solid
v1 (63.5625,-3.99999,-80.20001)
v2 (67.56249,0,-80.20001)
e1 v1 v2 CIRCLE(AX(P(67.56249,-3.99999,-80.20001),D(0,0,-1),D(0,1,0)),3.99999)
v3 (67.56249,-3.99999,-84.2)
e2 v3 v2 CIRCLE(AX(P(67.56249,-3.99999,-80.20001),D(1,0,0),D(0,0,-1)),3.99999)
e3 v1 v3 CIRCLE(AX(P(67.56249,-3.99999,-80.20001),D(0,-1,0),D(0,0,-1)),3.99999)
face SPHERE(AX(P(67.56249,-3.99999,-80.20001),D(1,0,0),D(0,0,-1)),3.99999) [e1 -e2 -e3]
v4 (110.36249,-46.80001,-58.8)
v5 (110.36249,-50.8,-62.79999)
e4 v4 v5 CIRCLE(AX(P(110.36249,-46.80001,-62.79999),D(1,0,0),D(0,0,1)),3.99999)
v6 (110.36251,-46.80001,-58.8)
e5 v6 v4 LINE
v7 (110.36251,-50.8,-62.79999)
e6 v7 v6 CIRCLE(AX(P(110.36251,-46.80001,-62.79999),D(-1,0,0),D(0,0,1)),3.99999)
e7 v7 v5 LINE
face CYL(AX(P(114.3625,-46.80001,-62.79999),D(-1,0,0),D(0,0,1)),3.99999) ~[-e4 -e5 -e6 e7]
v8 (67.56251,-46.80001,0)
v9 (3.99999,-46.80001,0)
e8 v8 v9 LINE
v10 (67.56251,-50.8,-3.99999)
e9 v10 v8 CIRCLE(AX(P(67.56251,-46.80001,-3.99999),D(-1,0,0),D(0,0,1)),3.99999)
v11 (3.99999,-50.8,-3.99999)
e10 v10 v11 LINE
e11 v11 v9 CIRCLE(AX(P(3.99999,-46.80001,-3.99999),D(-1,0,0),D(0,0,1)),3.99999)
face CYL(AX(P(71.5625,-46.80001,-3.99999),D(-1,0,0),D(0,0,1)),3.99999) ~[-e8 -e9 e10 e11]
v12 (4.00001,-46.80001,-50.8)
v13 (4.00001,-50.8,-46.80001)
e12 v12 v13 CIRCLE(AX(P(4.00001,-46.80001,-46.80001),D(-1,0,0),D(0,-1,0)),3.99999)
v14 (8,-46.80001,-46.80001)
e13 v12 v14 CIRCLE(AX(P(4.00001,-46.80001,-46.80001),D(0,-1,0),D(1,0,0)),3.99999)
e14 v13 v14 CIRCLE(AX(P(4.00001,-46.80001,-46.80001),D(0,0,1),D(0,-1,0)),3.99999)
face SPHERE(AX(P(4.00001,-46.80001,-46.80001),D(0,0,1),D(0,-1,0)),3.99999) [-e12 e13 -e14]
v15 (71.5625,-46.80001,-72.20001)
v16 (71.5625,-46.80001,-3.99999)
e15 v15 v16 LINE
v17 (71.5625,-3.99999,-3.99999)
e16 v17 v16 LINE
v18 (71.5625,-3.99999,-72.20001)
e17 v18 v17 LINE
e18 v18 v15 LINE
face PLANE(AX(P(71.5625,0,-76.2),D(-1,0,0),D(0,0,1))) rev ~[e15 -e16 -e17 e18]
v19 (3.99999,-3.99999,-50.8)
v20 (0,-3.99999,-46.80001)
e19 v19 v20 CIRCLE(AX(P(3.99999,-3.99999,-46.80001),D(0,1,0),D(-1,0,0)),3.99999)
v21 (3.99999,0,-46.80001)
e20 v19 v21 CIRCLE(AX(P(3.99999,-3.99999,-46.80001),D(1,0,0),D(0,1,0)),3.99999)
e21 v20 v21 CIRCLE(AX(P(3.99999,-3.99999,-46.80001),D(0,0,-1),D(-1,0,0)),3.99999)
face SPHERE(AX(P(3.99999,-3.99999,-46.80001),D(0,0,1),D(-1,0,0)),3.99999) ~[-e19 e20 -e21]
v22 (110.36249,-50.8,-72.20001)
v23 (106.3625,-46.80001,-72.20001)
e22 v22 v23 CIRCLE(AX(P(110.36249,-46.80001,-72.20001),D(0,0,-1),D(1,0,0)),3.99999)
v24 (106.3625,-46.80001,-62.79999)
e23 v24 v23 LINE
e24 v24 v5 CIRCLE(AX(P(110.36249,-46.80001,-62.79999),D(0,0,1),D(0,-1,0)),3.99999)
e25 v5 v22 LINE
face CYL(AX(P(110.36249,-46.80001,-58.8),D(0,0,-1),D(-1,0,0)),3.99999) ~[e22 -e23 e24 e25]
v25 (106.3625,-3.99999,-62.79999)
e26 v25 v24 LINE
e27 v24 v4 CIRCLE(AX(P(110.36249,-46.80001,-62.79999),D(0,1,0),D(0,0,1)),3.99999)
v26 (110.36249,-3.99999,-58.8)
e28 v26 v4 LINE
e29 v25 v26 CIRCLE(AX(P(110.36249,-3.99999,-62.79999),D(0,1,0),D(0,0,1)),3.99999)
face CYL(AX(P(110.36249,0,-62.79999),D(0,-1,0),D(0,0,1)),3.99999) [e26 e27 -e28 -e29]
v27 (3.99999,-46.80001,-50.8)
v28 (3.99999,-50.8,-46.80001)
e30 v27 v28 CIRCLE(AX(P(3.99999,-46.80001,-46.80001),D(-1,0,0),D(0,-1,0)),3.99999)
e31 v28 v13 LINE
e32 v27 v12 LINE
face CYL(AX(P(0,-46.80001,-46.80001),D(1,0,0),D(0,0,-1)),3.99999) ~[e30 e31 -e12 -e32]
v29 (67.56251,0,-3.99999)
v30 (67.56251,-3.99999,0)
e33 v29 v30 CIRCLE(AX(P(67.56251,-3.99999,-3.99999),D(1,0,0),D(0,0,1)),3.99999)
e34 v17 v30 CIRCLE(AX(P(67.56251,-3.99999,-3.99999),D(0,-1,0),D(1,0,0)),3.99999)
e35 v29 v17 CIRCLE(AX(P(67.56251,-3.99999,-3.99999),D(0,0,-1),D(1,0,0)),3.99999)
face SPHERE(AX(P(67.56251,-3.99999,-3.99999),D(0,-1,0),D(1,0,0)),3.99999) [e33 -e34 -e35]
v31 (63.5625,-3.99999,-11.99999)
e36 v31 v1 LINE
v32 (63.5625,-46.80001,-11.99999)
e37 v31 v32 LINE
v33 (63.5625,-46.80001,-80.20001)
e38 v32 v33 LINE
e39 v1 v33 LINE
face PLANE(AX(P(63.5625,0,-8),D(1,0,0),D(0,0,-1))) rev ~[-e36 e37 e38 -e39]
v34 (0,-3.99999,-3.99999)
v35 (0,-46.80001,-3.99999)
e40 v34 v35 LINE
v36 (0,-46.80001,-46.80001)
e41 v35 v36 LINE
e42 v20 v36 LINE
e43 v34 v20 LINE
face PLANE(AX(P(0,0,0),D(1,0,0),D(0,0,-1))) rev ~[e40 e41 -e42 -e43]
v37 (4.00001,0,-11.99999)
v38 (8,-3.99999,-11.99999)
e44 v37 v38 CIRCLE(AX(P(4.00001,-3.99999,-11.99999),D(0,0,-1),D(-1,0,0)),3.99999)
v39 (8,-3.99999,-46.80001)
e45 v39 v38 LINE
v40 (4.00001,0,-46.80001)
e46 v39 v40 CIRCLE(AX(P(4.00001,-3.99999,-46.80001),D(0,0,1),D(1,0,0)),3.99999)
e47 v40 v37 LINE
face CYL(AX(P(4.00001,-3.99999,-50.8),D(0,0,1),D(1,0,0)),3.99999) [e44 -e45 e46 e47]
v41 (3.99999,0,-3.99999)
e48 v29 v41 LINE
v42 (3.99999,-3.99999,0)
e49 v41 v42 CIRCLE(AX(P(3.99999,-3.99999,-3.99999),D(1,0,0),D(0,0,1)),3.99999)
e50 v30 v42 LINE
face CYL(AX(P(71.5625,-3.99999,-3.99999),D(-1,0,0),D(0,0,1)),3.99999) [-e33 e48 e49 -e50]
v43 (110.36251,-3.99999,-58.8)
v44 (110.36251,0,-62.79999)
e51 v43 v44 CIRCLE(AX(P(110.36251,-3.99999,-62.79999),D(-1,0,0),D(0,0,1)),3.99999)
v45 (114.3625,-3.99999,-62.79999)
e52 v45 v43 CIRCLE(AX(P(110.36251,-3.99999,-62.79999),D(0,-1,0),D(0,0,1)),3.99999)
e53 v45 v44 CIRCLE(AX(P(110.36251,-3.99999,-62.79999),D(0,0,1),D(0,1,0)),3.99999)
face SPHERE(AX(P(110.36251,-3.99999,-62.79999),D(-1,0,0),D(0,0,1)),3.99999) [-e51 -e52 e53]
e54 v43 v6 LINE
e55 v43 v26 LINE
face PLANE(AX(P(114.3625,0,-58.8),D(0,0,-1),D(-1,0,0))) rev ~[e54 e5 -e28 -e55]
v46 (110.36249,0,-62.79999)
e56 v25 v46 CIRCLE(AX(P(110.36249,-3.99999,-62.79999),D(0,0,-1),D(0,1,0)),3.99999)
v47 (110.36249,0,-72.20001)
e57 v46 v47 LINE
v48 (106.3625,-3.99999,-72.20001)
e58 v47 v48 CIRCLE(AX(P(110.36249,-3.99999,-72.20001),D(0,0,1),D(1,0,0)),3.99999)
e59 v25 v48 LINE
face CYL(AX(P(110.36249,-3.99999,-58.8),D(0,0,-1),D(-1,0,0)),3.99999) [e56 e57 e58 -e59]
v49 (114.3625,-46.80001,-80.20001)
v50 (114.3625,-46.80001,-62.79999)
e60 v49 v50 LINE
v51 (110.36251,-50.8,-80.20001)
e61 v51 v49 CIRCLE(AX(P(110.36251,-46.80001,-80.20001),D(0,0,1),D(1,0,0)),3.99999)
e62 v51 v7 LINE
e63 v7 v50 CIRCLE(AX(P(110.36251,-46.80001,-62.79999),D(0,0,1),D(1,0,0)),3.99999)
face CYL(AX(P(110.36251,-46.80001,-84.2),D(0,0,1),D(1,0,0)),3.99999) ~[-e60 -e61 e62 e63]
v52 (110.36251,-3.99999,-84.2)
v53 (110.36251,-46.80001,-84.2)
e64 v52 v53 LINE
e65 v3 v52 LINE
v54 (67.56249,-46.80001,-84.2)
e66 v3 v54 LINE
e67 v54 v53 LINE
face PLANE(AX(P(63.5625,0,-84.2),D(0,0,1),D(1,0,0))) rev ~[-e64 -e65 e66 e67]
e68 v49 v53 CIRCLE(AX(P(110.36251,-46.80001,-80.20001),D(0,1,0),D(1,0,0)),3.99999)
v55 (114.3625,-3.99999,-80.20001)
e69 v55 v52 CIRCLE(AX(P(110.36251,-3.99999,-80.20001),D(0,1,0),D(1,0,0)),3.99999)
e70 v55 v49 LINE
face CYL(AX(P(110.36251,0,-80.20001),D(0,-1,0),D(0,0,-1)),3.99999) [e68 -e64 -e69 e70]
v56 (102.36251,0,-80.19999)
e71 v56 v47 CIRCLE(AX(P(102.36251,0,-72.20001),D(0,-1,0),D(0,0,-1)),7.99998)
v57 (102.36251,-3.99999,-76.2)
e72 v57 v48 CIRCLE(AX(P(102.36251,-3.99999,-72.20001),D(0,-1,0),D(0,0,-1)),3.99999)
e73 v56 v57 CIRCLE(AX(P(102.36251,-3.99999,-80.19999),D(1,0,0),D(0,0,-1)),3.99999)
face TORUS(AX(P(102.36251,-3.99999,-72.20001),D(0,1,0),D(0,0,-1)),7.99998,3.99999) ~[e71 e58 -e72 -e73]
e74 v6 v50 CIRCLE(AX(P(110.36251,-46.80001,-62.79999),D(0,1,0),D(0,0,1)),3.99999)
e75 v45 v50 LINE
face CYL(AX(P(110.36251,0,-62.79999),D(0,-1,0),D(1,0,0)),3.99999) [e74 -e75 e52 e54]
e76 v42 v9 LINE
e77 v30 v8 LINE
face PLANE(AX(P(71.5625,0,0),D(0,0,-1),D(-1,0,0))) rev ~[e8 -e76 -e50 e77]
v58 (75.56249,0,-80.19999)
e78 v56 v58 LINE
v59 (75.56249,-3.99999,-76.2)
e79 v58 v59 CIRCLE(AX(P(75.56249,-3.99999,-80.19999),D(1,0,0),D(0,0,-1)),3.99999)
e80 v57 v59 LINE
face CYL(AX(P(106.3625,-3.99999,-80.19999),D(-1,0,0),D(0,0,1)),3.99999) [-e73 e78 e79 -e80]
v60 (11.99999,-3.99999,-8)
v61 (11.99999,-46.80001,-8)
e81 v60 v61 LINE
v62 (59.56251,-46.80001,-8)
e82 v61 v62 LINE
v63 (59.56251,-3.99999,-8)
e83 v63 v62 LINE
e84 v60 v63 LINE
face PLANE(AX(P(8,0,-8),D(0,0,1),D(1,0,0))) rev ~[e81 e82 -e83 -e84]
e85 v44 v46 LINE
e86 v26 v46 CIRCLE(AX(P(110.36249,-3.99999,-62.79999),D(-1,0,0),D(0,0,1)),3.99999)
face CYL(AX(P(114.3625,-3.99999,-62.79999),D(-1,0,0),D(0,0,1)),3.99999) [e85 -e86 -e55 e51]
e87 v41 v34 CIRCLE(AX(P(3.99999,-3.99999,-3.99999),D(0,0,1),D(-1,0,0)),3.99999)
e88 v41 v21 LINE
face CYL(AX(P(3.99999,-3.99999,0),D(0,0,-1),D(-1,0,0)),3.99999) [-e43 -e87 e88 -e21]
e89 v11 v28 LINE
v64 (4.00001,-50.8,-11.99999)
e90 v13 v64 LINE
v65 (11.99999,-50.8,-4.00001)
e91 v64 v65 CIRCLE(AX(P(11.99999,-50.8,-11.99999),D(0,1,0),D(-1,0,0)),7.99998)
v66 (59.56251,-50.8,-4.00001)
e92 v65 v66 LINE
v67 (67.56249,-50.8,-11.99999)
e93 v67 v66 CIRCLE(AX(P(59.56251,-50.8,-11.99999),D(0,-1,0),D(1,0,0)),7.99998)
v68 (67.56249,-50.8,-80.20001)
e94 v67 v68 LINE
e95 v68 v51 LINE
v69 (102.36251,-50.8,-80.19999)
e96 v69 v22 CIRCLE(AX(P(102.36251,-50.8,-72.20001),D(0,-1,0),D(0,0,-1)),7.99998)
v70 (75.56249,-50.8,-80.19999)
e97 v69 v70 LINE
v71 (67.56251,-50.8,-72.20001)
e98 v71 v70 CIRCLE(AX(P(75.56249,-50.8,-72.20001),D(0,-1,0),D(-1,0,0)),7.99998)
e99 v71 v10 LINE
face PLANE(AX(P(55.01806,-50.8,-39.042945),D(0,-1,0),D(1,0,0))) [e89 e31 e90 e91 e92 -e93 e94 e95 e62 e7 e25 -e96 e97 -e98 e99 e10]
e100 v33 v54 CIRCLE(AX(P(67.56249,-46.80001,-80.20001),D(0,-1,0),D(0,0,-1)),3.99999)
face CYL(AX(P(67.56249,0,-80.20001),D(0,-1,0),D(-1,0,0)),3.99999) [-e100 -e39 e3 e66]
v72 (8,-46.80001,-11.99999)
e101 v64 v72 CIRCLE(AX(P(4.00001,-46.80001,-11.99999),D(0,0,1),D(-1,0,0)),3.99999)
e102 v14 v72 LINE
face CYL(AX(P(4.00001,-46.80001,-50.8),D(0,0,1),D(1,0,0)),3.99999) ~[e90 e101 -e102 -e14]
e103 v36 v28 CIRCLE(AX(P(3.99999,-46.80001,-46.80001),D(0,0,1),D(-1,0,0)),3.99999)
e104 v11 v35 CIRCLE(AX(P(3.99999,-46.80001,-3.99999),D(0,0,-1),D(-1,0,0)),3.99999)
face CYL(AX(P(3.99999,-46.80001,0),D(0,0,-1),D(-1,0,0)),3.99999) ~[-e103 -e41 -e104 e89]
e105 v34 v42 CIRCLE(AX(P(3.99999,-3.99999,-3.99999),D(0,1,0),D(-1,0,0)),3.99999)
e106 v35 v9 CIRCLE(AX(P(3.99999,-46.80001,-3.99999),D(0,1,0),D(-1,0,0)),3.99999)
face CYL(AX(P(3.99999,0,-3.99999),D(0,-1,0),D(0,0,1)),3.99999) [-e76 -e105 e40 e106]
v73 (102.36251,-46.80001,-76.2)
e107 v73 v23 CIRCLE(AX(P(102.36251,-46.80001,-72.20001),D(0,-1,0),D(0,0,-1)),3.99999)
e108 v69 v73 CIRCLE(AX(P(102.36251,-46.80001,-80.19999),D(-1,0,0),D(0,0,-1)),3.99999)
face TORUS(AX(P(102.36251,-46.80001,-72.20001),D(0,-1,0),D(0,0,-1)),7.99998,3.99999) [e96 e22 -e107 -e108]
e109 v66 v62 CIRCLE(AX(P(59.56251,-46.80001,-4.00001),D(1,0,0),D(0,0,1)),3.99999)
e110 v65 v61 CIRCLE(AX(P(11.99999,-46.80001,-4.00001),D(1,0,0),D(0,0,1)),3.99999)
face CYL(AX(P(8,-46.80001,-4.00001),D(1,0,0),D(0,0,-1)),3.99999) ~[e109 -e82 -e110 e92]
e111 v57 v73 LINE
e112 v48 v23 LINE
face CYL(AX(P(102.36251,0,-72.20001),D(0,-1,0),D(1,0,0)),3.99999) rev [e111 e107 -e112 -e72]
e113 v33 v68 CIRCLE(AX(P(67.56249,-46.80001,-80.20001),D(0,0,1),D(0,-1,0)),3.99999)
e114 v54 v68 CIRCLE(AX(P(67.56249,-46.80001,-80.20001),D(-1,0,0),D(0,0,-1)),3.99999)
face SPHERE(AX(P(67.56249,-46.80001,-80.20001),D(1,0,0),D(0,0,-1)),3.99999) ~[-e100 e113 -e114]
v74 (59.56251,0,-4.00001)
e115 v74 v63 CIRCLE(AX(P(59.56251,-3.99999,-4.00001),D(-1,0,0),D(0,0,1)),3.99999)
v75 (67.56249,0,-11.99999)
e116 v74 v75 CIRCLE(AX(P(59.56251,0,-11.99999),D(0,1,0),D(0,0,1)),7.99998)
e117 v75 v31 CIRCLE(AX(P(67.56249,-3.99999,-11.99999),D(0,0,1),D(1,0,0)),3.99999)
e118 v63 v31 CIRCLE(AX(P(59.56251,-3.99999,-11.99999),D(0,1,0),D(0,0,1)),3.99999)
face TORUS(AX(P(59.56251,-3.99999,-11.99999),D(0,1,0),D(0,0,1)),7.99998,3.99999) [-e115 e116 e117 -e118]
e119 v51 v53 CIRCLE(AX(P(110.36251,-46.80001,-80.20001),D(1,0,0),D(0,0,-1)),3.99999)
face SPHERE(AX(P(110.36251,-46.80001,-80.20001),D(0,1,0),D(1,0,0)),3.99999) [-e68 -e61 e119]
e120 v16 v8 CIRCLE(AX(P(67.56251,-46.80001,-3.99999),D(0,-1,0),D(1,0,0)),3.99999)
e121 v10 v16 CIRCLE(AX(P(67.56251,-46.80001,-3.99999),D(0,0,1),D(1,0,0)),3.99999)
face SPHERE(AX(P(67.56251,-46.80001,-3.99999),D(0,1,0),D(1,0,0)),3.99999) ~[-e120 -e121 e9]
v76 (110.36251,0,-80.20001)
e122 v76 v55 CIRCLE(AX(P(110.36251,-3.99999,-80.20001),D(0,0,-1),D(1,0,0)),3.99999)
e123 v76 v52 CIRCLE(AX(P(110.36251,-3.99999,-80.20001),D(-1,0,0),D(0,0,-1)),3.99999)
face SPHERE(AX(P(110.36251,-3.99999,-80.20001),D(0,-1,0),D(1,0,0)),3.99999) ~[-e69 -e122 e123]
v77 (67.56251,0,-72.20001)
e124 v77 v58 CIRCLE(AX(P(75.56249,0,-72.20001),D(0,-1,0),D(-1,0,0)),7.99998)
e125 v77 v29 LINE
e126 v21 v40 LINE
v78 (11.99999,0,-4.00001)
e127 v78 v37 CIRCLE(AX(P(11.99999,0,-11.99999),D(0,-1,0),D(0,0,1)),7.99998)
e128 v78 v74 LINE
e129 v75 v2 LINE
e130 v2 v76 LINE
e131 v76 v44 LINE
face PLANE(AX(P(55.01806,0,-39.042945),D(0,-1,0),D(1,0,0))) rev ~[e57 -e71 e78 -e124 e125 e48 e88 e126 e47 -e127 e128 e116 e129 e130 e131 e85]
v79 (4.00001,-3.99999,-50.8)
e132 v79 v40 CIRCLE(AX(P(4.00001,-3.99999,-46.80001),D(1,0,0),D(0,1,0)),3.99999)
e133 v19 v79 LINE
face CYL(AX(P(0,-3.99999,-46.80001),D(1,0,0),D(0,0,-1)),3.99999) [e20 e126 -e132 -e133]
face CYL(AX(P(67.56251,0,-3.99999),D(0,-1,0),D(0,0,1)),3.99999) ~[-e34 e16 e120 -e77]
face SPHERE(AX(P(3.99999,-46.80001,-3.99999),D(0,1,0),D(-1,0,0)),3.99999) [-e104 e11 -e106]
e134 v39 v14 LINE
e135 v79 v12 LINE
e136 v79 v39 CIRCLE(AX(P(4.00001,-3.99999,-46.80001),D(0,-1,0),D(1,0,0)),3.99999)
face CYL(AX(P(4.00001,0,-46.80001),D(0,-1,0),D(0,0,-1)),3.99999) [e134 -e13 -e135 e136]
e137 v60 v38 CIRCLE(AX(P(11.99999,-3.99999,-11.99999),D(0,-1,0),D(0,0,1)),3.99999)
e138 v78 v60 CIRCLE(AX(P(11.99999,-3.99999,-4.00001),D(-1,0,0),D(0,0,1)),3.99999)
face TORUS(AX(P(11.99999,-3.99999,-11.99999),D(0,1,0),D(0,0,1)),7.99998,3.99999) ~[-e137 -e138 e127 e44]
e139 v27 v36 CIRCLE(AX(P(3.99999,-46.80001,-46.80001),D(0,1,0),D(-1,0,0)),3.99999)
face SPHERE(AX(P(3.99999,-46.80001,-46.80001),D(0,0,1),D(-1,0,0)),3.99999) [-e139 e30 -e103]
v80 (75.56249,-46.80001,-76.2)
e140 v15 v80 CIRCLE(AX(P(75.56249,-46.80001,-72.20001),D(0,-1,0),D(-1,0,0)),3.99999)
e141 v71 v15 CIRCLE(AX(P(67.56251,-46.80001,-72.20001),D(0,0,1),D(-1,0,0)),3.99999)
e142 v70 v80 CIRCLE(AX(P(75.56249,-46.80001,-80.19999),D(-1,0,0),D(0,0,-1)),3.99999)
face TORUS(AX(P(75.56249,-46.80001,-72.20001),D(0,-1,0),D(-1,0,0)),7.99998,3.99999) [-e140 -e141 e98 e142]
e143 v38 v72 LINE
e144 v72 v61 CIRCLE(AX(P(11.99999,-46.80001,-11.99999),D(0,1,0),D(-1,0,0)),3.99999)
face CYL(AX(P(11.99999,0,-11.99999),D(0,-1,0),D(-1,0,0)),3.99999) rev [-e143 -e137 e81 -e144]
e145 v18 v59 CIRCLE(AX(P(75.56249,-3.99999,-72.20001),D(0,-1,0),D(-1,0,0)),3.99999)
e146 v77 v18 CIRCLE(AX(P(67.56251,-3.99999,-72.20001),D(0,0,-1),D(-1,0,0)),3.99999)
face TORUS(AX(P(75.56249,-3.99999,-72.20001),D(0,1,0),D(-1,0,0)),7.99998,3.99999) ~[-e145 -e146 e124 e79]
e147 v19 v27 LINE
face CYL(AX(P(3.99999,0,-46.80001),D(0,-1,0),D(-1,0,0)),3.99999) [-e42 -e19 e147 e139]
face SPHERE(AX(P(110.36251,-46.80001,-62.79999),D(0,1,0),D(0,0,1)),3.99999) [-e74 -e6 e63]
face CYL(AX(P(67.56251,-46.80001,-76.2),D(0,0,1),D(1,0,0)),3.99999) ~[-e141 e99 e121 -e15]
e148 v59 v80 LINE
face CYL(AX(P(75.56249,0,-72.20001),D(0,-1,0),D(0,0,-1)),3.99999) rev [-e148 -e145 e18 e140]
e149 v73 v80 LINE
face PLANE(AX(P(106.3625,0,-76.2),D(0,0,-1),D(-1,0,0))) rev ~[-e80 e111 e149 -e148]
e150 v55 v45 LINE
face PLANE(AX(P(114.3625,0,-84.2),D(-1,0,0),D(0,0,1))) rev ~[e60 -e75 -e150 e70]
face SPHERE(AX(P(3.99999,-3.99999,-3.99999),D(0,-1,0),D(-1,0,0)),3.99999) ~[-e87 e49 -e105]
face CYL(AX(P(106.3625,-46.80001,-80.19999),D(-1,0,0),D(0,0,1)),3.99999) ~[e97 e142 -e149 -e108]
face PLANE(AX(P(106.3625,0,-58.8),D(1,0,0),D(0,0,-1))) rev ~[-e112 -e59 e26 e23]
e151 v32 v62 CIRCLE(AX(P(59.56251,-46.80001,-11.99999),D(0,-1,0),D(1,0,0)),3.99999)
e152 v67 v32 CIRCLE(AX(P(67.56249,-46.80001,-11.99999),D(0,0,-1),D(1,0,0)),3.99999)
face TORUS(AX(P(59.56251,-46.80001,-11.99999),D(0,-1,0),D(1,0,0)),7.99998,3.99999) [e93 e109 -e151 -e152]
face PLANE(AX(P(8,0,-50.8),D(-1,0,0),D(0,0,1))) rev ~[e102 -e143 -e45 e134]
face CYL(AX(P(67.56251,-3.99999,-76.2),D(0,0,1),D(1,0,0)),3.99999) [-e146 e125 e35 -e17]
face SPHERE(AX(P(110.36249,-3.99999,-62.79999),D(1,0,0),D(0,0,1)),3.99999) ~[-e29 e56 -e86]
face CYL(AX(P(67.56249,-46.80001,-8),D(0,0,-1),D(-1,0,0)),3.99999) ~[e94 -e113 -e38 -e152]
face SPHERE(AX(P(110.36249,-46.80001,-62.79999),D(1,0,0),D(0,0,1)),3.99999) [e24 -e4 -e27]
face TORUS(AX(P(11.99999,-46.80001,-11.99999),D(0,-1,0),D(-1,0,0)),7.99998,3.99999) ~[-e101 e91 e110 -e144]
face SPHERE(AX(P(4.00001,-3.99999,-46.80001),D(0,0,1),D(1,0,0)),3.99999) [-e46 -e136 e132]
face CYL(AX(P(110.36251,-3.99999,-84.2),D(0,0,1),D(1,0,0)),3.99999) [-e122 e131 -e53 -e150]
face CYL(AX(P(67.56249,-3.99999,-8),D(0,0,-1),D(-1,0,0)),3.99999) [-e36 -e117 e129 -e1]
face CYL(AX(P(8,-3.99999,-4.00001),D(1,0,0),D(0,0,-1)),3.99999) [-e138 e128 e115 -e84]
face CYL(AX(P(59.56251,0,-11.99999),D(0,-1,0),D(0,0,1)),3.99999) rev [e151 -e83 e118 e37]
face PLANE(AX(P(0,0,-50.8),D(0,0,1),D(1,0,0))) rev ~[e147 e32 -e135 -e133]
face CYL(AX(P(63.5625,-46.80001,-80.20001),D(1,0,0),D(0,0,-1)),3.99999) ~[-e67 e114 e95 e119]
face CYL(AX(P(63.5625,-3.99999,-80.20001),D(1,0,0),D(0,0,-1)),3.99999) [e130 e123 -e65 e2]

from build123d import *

# Parameters (mm, degrees)
F1_DEPTH = 50.8
F2_R     = 3.99999


# Not quite as in the source:
# - a fillet or chamfer is up to 0.001 mm smaller than in the source, because OpenCascade refuses the exact size


with BuildPart() as f1:
    # F0 (on Front) → F1 (new body)
    with BuildSketch(Plane.XZ):
        Polygon((71.5625, 0), (0, 0), (0, -50.8), (8, -50.8), (8, -8), (63.5625, -8), (63.5625, -84.2), (114.3625, -84.2), (114.3625, -58.8), (106.3625, -58.8), (106.3625, -76.2), (71.5625, -76.2), align=None)
    extrude(amount=F1_DEPTH)

    # F2 (radius 4 in the source; OpenCascade refuses exactly that, so slightly less here)
    f2_edges = [f1.edges().sort_by_distance(p)[0] for p in [
        (0, -25.4, 0),
        (71.5625, -25.4, 0),
        (71.5625, -25.4, -76.2),
        (106.3625, -25.4, -76.2),
        (71.5625, -50.8, -38.1),
        (71.5625, 0, -38.1),
        (110.3625, 0, -58.8),
        (114.3625, -25.4, -58.8),
        (110.3625, -50.8, -58.8),
        (106.3625, -25.4, -58.8),
        (114.3625, -25.4, -84.2),
        (114.3625, -50.8, -71.5),
        (114.3625, 0, -71.5),
        (88.9625, 0, -84.2),
        (88.9625, -50.8, -84.2),
        (63.5625, -25.4, -84.2),
        (63.5625, -50.8, -46.1),
        (63.5625, 0, -46.1),
        (0, 0, -25.4),
        (0, -50.8, -25.4),
        (0, -25.4, -50.8),
        (88.9625, 0, -76.2),
        (8, 0, -29.4),
        (8, -50.8, -29.4),
        (35.78125, -50.8, -8),
        (88.9625, -50.8, -76.2),
        (106.3625, 0, -67.5),
        (4, -50.8, -50.8),
        (106.3625, -50.8, -67.5),
        (8, -25.4, -50.8),
        (35.78125, -50.8, 0),
        (35.78125, 0, 0),
        (8, -25.4, -8),
        (63.5625, -25.4, -8),
        (4, 0, -50.8),
        (35.78125, 0, -8),
    ]]
    fillet(f2_edges, radius=F2_R)


solid = f1.part
